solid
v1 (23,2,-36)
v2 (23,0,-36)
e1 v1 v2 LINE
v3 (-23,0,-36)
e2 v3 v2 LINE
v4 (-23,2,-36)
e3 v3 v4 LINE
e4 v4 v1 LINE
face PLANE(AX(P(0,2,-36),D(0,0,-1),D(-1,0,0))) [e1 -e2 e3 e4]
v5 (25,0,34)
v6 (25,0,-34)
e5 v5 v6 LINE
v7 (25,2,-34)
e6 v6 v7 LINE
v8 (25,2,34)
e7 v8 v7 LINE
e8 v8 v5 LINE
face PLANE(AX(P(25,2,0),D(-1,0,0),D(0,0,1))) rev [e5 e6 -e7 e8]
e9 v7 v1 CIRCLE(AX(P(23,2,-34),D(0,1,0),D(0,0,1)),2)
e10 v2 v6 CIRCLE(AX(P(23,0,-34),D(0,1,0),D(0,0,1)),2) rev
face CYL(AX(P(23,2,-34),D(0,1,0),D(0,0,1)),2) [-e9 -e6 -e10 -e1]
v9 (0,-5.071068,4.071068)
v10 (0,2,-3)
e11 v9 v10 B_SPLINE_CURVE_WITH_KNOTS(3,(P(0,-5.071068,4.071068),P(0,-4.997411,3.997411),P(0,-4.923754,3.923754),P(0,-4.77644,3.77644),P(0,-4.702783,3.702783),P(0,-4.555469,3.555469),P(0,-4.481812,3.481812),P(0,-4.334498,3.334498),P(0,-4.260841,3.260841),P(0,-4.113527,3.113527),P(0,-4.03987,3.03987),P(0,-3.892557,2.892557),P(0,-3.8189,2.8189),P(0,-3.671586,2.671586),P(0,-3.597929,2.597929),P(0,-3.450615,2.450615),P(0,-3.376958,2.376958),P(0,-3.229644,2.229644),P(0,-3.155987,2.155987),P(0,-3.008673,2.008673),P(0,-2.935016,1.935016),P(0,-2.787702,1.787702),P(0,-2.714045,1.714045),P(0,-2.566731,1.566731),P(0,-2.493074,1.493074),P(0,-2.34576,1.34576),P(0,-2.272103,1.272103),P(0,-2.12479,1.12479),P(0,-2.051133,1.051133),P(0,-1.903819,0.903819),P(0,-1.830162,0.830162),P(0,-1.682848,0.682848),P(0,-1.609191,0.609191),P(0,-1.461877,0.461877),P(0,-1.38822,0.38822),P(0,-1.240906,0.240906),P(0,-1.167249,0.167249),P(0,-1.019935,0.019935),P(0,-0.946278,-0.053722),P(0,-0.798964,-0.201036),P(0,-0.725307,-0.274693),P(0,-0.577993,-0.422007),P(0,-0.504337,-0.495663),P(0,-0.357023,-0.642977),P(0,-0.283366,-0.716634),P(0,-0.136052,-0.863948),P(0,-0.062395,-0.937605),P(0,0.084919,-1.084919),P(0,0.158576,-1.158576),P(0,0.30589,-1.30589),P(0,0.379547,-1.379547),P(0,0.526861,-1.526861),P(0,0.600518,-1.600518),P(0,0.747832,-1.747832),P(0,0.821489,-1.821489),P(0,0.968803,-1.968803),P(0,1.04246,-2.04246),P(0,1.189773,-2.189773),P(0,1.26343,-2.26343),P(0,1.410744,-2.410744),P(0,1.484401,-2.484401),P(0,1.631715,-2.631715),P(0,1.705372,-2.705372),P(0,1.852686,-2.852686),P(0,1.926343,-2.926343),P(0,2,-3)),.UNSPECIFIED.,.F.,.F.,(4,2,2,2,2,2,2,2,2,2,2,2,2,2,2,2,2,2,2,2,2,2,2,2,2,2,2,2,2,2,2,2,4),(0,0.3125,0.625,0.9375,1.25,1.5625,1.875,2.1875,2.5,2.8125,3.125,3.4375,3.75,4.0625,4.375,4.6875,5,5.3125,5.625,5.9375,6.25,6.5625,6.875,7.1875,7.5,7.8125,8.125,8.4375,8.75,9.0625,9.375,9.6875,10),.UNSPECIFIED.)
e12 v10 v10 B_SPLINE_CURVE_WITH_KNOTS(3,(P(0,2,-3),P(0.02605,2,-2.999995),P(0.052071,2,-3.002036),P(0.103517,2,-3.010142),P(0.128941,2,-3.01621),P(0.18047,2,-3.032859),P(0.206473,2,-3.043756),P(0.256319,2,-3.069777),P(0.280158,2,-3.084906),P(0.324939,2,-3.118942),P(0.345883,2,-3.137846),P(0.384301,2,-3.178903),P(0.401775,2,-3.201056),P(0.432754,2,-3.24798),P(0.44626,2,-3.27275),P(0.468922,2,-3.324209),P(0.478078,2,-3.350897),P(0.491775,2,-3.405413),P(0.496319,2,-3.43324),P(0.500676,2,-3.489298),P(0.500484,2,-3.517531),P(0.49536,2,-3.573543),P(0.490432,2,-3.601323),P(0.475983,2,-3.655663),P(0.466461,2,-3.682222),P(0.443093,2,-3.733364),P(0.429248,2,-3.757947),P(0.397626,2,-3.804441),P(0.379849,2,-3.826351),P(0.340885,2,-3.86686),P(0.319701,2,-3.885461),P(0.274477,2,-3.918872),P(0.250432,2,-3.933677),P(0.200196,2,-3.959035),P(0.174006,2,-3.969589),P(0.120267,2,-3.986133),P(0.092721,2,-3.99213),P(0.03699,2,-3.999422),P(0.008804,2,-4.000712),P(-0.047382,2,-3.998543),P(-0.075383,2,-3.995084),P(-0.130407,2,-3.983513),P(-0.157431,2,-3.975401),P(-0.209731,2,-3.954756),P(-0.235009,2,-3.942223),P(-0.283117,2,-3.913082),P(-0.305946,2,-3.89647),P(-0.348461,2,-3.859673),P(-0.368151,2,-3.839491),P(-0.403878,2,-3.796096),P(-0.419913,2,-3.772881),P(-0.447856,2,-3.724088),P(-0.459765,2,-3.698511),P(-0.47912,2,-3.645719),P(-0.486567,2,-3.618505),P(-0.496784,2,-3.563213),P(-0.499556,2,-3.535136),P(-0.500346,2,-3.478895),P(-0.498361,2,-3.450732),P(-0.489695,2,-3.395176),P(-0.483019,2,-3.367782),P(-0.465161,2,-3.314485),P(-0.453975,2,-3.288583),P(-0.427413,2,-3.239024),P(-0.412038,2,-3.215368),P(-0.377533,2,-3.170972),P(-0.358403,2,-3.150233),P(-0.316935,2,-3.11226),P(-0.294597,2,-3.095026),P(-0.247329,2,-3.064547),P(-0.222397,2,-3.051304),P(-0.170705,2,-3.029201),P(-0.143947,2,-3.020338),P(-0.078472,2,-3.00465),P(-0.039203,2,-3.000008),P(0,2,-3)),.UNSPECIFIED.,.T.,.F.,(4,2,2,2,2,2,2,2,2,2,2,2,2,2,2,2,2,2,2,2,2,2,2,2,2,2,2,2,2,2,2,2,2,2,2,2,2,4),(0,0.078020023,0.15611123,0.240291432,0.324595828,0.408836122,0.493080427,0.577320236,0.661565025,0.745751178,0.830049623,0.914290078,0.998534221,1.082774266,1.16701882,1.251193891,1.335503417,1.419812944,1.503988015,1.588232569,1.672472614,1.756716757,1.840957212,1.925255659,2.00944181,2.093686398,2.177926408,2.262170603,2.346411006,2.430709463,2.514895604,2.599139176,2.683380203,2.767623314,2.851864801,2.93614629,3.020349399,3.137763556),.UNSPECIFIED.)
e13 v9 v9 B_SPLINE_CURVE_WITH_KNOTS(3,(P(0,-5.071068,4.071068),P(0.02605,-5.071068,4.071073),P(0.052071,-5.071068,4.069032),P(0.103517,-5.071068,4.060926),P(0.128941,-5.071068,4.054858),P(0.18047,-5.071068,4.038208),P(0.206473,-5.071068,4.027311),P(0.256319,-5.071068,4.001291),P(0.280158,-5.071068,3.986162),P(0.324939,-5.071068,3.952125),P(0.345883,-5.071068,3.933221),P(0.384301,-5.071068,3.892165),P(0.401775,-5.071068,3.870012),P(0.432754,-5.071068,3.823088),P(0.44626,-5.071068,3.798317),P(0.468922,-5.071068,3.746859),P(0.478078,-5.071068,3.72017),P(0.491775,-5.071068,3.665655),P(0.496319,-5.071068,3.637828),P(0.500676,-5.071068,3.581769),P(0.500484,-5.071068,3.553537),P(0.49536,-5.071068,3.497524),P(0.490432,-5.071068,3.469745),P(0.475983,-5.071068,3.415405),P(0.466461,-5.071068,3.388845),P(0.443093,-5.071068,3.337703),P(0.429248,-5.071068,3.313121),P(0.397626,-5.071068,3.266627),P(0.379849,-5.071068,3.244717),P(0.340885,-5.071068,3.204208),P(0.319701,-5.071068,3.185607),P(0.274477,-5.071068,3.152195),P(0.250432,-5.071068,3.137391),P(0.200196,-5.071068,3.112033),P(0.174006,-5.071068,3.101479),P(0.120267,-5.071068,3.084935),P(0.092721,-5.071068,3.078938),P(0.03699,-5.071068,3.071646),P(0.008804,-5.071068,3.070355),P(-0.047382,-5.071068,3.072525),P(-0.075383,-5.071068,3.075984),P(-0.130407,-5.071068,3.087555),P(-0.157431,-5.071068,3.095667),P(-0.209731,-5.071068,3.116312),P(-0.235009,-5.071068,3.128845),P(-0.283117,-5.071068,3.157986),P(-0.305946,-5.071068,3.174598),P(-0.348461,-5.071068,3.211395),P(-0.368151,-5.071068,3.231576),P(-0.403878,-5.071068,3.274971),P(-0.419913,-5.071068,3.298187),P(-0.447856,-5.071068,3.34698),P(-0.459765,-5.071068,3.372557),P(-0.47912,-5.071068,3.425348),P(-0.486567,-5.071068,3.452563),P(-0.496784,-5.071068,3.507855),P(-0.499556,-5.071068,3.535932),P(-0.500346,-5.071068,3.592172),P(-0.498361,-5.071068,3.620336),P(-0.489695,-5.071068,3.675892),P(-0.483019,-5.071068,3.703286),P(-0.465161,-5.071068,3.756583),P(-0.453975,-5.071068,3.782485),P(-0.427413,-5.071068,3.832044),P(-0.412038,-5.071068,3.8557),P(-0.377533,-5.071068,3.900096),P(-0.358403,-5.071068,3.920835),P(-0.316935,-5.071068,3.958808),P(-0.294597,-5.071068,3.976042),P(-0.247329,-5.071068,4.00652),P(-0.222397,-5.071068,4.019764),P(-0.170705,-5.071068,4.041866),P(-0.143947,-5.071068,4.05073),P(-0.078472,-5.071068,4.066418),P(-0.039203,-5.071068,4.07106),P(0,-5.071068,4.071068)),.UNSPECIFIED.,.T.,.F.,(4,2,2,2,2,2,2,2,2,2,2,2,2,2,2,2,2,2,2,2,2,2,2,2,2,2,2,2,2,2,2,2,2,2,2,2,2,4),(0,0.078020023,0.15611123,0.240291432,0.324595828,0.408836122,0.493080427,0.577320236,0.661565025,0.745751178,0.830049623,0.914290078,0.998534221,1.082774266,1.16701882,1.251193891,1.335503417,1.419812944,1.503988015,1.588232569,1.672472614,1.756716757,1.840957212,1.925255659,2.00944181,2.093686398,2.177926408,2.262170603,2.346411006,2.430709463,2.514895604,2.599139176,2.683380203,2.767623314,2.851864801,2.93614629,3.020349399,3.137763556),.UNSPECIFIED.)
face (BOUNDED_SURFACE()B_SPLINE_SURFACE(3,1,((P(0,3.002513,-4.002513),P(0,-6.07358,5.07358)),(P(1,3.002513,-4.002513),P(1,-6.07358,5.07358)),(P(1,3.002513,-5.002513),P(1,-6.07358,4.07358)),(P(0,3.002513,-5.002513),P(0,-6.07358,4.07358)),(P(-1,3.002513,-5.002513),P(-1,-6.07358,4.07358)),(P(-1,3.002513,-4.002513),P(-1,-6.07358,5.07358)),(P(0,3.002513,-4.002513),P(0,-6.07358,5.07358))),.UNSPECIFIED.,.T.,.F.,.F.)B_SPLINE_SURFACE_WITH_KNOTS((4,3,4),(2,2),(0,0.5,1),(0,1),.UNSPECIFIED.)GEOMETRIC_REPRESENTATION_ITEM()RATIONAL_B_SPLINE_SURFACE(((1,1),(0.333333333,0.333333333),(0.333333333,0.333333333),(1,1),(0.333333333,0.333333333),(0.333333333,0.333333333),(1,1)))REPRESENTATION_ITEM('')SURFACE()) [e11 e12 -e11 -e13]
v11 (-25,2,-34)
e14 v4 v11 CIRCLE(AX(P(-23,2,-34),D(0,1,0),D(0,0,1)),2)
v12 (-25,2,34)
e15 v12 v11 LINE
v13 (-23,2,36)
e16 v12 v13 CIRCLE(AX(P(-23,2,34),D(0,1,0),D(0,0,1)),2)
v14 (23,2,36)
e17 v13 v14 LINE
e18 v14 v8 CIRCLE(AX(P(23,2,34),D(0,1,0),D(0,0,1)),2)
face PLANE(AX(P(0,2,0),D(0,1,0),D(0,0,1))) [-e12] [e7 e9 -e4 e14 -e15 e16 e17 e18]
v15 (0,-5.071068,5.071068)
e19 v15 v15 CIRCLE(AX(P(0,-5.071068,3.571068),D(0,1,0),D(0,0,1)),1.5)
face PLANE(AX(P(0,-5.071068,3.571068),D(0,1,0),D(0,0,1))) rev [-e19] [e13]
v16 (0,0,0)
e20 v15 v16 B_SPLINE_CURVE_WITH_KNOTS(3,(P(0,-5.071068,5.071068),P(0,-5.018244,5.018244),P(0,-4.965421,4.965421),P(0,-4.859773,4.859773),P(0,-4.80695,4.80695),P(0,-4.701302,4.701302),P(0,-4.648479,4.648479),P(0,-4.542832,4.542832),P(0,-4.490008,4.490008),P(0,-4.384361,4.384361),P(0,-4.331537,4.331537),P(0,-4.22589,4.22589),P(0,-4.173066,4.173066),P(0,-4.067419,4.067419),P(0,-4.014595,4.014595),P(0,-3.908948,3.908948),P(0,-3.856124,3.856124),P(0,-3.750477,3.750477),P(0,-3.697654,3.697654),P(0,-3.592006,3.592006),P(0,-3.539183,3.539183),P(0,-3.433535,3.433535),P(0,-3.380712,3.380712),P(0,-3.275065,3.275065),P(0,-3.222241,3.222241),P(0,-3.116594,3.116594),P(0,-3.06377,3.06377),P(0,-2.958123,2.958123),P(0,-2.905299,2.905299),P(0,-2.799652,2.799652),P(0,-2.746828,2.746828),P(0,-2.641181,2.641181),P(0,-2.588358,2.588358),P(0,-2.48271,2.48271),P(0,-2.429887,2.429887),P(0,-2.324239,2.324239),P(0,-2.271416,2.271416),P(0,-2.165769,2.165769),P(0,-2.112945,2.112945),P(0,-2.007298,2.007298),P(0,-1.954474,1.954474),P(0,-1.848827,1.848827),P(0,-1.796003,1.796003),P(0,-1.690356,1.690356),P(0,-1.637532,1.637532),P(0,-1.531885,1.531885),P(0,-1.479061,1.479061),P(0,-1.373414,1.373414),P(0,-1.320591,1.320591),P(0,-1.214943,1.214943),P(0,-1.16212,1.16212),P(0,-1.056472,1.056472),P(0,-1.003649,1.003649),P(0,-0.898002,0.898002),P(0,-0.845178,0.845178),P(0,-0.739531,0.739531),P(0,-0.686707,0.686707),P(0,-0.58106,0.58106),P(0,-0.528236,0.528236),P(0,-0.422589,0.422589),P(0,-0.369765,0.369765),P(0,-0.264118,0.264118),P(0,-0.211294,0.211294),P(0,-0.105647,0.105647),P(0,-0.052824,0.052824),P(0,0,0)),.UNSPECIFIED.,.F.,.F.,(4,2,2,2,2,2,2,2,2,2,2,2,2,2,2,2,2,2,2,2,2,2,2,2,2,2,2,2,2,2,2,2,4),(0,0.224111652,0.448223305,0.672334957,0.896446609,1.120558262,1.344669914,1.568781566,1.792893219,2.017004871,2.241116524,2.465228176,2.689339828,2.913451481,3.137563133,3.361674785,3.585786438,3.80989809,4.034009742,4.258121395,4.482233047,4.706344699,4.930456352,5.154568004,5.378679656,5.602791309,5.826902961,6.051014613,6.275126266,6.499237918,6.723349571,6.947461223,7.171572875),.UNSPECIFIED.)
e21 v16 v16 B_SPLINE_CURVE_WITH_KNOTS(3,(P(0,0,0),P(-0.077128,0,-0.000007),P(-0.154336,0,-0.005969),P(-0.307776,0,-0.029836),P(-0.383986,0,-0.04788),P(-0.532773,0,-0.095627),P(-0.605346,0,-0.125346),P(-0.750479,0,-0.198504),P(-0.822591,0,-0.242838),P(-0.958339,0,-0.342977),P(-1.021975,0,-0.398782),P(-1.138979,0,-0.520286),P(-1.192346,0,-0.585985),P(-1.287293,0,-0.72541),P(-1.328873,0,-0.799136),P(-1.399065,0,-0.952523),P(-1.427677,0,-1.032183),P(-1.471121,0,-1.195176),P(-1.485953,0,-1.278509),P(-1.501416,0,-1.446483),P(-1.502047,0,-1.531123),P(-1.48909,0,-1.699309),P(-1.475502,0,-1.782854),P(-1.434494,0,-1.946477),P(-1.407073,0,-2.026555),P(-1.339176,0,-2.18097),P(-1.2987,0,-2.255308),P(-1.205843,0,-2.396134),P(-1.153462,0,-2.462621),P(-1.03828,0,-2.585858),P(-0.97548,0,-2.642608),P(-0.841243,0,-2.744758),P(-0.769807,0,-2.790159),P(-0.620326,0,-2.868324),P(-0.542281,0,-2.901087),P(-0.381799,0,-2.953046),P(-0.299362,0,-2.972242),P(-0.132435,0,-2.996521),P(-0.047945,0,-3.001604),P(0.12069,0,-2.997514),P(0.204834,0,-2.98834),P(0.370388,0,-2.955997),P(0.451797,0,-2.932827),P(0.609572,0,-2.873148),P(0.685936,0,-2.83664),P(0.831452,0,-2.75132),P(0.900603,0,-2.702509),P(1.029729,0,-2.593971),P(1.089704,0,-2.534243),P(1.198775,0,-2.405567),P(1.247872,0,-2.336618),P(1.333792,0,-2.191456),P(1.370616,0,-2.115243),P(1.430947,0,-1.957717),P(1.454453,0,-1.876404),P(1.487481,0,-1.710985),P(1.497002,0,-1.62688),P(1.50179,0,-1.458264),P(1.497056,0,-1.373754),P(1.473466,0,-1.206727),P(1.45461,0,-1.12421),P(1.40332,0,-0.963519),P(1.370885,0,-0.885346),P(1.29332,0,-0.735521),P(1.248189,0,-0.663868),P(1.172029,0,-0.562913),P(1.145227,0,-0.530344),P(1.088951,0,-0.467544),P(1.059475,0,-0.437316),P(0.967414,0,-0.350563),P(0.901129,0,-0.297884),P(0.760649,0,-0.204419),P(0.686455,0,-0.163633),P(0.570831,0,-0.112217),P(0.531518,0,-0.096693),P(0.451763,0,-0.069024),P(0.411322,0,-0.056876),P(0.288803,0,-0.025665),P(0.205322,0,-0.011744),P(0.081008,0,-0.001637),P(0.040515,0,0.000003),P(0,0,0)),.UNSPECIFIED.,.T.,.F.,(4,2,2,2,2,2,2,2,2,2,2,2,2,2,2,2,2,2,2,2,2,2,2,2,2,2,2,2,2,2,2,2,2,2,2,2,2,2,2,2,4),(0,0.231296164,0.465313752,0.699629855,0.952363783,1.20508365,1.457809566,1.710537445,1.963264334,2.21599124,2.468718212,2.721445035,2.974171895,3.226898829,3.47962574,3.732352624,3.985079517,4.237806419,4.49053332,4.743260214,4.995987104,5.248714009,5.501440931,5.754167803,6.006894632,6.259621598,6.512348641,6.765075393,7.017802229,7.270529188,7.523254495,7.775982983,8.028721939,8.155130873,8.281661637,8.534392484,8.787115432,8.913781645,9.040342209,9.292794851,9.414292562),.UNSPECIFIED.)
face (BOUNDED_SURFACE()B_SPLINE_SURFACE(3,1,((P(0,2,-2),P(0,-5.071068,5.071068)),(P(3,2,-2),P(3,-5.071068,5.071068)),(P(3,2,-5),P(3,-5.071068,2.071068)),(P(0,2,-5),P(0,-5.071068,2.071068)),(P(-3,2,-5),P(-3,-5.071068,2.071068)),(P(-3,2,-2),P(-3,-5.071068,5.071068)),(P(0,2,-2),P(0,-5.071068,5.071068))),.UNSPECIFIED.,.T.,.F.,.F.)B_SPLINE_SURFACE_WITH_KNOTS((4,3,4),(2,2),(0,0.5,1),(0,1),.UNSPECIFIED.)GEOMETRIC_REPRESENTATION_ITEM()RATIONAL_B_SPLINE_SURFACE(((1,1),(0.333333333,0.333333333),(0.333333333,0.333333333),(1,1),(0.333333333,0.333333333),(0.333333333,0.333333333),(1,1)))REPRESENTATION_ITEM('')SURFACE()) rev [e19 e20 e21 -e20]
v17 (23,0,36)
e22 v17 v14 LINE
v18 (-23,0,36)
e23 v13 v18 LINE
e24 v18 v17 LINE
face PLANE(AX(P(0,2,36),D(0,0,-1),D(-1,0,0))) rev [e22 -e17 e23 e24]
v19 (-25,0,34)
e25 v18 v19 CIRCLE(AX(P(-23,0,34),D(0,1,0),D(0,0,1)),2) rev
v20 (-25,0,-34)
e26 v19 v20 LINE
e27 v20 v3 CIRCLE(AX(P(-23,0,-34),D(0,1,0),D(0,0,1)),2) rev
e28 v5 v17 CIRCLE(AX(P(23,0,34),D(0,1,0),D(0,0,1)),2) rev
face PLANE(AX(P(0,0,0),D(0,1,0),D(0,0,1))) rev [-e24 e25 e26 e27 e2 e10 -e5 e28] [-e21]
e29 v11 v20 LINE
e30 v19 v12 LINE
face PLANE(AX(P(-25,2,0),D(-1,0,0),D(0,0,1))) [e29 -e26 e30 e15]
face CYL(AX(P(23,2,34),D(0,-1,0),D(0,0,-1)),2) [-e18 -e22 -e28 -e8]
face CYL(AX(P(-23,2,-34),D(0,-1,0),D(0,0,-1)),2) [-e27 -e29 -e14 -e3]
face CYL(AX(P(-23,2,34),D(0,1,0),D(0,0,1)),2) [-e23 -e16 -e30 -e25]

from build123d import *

# Parameters (mm, degrees)
PLATFORM_W                   = 50
PLATFORM_H                   = 72
PLATFORM_W_2                 = 22.5
PLATFORM_H_2                 = 43
PLATFORM_HEIGHT_DEPTH        = 2
TUBE_OUTER_DIAMETER_SKETCH_R = 1.5
TUBE_START                   = -6.464466201
TUBE_INNER_DIAMETER_DEPTH    = 10.707106612
FILLET1_R                    = 2


# Read off the part's stored shape, not the designer's step: Tube Inner Diameter
with BuildPart() as part:
    # Platform → Platform Height (new body)
    # profile 1 of 2: a face of its own
    with BuildSketch(Plane(origin=(0, 0, 0), x_dir=(1, 0, 0), z_dir=(0, 1, 0))):
        Rectangle(PLATFORM_W, PLATFORM_H)
        Rectangle(PLATFORM_W_2, PLATFORM_H_2, mode=Mode.SUBTRACT)
    # profile 2 of 2: a face of its own
    with BuildSketch(Plane(origin=(0, 0, 0), x_dir=(1, 0, 0), z_dir=(0, 1, 0))):
        Rectangle(PLATFORM_W_2, PLATFORM_H_2)
    extrude(amount=PLATFORM_HEIGHT_DEPTH)

    # Tube Outer Diameter: sweep along a curve in space
    with BuildLine() as tube_outer_diameter_path:
        Line((0, 2, -3.5), (0, -5.071067812, 3.571067812))
    # Tube Outer Diameter Sketch → Tube Outer Diameter (sweep)
    with BuildSketch(Plane(origin=(0, 2, 0), x_dir=(1, 0, 0), z_dir=(0, 1, 0))):
        with Locations((0, 3.5)):
            Circle(TUBE_OUTER_DIAMETER_SKETCH_R)
    sweep(path=tube_outer_diameter_path.line)

    # Tube Inner Diameter outline → Tube Inner Diameter (cut)
    with BuildSketch(Plane(origin=(0, 0, 0), x_dir=(1, 0, 0), z_dir=(0, 0.7071067811865487, -0.7071067811865464)).offset(TUBE_START)):
        with BuildLine():
            add(Edge.make_bspline(
                [(0, 0.707106781), (1, 0.707106781), (1, 1.414213562), (0, 1.414213562), (-1, 1.414213562), (-1, 0.707106781), (0, 0.707106781)],
                knots=[0, 0, 0, 0, 0.5, 0.5, 0.5, 1, 1, 1, 1], degree=3, weights=[1, 0.333333333, 0.333333333, 1, 0.333333333, 0.333333333, 1]))
        make_face()
    extrude(amount=TUBE_INNER_DIAMETER_DEPTH, mode=Mode.SUBTRACT)

    # Fillet1
    fillet1_edges = [part.edges().sort_by_distance(p)[0] for p in [
        (-25, 1, 36),
        (-25, 1, -36),
        (25, 1, -36),
        (25, 1, 36),
    ]]
    fillet(fillet1_edges, radius=FILLET1_R)


solid = part.part
